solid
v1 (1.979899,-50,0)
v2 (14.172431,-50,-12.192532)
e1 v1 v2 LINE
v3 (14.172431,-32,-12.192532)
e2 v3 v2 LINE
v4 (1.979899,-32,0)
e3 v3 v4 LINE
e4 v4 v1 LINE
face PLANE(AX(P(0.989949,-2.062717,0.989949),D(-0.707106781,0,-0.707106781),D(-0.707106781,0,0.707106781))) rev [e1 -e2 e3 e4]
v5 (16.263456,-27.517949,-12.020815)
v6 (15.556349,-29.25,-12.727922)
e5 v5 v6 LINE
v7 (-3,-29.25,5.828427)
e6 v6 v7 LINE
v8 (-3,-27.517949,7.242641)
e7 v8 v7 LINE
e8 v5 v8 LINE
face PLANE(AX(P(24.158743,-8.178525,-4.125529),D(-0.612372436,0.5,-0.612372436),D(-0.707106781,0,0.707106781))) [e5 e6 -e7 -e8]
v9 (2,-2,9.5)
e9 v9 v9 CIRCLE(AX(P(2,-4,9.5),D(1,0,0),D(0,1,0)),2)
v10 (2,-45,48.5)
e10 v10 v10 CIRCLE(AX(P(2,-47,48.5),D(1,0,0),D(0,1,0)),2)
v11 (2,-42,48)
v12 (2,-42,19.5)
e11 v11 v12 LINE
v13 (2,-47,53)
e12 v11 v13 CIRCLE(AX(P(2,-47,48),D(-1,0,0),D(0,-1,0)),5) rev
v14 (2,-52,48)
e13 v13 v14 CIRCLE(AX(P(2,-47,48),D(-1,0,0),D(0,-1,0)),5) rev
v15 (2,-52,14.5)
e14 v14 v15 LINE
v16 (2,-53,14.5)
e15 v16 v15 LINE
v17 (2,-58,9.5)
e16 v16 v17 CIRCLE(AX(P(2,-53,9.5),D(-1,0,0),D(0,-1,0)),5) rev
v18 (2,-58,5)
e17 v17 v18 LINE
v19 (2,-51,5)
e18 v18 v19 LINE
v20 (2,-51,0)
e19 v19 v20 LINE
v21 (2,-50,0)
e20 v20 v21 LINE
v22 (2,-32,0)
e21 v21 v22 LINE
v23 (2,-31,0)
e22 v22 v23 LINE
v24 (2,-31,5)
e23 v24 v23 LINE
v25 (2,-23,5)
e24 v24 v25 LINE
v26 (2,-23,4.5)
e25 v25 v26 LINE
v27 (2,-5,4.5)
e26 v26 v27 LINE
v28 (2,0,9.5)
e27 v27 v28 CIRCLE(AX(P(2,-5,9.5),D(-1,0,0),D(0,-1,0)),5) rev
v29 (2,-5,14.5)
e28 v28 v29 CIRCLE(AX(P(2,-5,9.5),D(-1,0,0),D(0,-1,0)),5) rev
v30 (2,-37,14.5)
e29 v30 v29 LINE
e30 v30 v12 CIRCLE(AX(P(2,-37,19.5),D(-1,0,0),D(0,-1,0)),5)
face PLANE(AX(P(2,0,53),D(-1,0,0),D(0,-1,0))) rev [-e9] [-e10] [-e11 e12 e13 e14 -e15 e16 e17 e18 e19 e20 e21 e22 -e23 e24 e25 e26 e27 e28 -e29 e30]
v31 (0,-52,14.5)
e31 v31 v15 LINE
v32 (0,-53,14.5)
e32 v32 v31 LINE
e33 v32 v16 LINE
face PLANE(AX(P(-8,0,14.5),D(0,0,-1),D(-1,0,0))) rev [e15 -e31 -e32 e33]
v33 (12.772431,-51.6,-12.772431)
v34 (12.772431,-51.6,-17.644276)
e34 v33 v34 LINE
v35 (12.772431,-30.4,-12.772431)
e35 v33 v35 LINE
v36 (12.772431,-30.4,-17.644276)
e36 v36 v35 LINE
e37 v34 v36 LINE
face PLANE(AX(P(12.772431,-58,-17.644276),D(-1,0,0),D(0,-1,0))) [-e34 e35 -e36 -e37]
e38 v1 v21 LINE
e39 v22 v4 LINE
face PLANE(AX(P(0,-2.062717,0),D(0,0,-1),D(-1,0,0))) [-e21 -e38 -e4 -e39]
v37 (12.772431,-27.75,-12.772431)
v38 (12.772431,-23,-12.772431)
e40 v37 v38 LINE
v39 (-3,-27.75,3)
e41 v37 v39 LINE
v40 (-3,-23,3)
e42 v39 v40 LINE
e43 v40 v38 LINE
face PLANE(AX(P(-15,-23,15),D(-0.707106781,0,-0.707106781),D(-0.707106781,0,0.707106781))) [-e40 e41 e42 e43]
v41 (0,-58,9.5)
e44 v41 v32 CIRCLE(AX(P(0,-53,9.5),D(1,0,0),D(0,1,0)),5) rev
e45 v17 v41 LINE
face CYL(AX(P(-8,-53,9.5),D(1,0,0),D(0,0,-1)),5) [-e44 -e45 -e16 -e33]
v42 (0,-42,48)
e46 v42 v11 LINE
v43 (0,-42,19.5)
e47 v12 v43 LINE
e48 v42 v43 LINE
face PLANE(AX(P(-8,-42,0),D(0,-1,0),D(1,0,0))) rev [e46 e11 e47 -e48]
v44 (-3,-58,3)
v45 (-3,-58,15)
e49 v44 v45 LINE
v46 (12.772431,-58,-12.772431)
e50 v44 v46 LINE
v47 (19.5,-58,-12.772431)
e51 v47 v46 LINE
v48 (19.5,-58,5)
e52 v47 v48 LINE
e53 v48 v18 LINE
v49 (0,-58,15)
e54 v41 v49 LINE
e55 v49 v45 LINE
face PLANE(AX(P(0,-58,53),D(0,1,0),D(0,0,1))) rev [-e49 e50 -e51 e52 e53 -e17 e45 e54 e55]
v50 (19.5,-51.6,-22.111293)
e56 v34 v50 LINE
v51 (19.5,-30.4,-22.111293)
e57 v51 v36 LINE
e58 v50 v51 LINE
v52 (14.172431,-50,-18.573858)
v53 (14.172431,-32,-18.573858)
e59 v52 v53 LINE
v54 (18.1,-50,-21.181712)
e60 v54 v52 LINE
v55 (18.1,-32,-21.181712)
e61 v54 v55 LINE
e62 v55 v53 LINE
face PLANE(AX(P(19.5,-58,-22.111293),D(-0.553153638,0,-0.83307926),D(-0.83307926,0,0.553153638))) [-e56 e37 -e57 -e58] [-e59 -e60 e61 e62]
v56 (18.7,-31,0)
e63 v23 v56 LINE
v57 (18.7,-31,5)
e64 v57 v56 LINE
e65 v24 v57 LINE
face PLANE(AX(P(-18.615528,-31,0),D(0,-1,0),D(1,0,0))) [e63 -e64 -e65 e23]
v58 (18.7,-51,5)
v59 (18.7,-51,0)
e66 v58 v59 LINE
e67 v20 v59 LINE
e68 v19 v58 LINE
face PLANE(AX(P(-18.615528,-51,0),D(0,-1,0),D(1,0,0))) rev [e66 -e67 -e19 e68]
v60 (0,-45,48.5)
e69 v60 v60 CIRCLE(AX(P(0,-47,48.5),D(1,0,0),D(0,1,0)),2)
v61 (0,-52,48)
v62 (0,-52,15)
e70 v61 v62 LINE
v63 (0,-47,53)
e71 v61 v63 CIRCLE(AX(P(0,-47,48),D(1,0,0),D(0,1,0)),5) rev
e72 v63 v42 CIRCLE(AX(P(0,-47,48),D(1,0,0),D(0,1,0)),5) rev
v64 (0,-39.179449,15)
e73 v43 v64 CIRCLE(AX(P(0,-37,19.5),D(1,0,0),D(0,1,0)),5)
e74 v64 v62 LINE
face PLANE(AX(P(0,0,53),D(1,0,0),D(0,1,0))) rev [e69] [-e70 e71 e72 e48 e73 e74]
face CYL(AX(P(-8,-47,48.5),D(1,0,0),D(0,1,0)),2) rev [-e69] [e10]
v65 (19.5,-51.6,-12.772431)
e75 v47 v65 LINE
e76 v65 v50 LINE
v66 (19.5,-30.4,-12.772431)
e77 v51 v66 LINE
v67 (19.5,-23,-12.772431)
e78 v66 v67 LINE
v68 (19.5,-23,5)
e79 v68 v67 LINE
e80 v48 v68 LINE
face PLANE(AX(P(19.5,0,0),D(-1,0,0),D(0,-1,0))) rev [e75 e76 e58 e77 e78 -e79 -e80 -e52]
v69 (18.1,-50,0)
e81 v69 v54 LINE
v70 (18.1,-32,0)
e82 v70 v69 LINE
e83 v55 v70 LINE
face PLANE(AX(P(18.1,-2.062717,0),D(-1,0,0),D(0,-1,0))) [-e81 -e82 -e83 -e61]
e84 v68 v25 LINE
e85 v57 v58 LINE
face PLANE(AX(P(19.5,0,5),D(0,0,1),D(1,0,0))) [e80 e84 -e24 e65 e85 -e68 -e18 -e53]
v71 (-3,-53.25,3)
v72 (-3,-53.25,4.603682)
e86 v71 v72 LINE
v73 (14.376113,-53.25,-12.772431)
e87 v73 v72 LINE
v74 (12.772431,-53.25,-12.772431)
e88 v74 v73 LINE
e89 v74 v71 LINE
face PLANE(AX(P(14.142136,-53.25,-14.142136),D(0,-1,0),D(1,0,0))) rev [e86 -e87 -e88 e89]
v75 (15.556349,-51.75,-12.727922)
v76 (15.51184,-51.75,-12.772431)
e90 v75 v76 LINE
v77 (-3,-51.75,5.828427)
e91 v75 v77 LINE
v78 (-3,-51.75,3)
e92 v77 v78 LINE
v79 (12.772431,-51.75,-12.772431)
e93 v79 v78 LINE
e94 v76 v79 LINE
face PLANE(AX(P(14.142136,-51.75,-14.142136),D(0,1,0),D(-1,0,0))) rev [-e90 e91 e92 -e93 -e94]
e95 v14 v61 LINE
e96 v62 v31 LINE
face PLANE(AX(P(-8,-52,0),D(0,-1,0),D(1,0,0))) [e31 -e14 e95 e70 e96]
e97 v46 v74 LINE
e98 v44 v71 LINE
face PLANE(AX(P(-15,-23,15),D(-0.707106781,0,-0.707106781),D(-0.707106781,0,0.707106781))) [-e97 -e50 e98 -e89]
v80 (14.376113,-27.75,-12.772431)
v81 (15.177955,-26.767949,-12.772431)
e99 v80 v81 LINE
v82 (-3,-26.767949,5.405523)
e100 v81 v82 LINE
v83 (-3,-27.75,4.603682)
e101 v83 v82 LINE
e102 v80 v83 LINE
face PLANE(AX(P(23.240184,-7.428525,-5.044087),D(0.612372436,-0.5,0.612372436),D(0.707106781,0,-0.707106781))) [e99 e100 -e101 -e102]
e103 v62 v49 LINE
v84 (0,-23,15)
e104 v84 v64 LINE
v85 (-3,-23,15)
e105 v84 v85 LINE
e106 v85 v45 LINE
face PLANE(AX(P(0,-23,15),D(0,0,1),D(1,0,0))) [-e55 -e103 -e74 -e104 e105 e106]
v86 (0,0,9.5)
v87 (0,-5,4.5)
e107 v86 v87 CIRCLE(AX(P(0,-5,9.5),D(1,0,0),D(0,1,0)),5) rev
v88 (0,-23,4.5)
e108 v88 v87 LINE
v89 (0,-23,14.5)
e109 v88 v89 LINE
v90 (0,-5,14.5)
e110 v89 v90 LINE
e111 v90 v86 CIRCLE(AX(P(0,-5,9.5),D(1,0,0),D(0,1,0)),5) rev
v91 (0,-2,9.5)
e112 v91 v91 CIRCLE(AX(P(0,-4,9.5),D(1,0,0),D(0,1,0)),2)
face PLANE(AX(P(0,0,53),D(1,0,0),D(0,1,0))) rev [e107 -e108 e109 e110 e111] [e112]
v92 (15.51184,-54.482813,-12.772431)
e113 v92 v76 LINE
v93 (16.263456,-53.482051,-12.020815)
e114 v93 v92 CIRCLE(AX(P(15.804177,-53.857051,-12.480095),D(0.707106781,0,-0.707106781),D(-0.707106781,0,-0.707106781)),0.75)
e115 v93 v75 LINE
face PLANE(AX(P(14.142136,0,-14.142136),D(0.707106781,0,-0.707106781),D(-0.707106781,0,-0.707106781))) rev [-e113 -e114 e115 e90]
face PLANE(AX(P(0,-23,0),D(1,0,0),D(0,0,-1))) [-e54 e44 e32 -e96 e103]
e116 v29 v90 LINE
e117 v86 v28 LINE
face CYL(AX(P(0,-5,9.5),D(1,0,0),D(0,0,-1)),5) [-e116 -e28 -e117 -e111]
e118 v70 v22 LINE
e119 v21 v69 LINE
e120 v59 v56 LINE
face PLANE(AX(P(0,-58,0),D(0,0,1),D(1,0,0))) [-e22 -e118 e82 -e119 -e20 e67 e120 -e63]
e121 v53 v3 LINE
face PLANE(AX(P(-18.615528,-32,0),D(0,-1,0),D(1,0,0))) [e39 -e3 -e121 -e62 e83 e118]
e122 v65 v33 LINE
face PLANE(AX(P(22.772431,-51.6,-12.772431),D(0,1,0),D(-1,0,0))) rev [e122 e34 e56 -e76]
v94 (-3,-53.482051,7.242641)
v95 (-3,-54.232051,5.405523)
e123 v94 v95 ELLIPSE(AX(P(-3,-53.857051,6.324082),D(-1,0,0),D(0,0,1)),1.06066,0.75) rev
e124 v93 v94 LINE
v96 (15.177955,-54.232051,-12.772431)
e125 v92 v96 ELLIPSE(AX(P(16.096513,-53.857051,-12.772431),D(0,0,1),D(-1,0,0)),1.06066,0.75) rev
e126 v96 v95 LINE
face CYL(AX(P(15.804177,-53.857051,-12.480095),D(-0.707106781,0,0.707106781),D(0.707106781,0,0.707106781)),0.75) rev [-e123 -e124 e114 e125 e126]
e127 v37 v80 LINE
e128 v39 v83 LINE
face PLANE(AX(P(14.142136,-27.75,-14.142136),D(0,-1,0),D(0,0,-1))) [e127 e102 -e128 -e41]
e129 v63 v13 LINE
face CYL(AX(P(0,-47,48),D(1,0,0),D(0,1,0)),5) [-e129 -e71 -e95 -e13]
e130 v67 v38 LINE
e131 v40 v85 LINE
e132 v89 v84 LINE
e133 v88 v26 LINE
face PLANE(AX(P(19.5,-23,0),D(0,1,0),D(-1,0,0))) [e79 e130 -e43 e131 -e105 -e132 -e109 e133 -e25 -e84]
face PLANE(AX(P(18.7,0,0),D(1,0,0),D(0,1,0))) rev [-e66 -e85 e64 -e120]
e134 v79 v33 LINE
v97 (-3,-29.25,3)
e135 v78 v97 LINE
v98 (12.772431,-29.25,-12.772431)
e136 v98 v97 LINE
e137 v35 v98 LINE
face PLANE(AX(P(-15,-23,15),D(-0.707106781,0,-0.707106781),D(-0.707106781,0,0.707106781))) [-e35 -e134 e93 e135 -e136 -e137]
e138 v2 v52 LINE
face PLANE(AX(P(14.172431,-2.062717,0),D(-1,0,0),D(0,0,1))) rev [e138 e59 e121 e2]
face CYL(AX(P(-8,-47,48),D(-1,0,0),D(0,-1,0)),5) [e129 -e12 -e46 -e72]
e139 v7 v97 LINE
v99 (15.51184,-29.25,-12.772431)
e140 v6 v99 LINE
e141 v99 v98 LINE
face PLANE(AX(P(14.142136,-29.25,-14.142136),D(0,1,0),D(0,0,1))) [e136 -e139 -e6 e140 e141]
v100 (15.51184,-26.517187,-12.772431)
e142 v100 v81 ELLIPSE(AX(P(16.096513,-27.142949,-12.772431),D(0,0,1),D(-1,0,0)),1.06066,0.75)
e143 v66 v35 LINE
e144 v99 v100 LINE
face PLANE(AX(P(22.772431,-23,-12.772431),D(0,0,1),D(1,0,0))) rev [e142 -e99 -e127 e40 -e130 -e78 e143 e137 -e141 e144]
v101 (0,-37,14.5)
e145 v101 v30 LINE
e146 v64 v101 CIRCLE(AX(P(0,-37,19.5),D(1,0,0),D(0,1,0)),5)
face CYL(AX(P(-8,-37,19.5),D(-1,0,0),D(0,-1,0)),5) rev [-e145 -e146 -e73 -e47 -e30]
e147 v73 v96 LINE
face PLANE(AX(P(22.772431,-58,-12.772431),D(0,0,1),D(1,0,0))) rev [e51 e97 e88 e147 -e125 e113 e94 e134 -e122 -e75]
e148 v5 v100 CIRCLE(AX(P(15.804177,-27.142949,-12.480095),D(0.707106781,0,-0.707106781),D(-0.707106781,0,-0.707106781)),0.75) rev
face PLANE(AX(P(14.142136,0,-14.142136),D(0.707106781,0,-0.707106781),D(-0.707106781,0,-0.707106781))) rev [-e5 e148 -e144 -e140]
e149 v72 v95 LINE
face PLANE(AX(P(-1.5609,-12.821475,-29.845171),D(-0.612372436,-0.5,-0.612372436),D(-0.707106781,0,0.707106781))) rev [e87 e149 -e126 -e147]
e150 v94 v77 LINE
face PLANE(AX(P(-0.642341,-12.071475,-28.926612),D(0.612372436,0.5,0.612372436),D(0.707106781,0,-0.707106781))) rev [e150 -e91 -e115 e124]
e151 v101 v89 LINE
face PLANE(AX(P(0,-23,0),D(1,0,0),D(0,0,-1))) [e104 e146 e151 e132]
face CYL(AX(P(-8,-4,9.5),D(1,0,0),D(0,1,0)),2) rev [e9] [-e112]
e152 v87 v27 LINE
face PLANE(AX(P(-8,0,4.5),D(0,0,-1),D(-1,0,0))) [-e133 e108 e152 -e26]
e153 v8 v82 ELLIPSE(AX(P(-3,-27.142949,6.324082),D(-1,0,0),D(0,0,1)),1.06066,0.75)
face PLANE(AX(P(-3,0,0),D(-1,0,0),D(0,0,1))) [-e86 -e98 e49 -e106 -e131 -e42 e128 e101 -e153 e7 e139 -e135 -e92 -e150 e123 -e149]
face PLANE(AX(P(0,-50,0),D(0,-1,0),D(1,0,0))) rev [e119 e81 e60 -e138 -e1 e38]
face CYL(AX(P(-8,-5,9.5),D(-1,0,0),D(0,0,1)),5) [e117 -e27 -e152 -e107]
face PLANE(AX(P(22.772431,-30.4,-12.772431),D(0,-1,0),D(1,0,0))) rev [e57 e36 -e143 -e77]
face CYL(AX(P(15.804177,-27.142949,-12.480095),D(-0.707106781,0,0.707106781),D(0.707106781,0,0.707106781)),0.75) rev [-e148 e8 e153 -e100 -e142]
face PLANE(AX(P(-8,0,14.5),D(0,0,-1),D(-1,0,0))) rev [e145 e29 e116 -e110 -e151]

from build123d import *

# Parameters (mm, degrees)
SKETCH_1_W               = 2
SKETCH_1_H               = 58
EXTRUDE_1_DEPTH          = 53
SKETCH_4_W               = 5
SKETCH_4_H               = 35
EXTRUDE_3_DEPTH          = 19.5
CUT_EXTRUDE_START        = -0.8
SKETCH_9_W               = 5
SKETCH_9_H               = 20
CUT_EXTRUDE_5_DEPTH      = 16.7
SKETCH_10_R              = 2
CUT_EXTRUDE_6_DEPTH      = 10
SKETCH_11_W              = 38.5
SKETCH_11_H              = 6
SKETCH_11_H_2            = 42
SKETCH_11_W_2            = 4.5
SKETCH_11_H_3            = 23
CUT_EXTRUDE_7_DEPTH      = 10
FILLET_1_R               = 5
EXTRUDE_4_DEPTH          = 35
EXTRUDE_5_DEPTH          = 35
CUT_EXTRUDE_START_2      = 5
SKETCH_14_W              = 17.67500243
SKETCH_14_H              = 173.36044852
CUT_EXTRUDE_9_DEPTH      = 12
CUT_EXTRUDE_START_3      = 19
CUT_EXTRUDE_10_DEPTH     = 18
SKETCH_16_W              = 19.32347426
SKETCH_16_H              = 7.4
SKETCH_16_W_2            = 22.441906264
SKETCH_16_H_2            = 6.4
CUT_EXTRUDE_11_DEPTH     = 10
CUT_EXTRUDE_8_DEPTH      = 20
CUT_EXTRUDE_8_DEPTH_BACK = 43


with BuildPart() as part:
    # Эскиз1 → Бобышка-Вытянуть1 (new body)
    with BuildSketch(Plane.XY):
        with Locations((1, -29)):
            Rectangle(SKETCH_1_W, SKETCH_1_H)
    extrude(amount=EXTRUDE_1_DEPTH)

    # Эскиз4 → Бобышка-Вытянуть3 (add)
    with BuildSketch(Plane.ZY):
        with Locations((2.5, -40.5)):
            Rectangle(SKETCH_4_W, SKETCH_4_H)
    extrude(amount=-EXTRUDE_3_DEPTH)

    # Эскиз9 → Вырез-Вытянуть5 (cut)
    with BuildSketch(Plane(origin=(19.5, 0, 0), x_dir=(0, 0, -1), z_dir=(1, 0, 0)).offset(CUT_EXTRUDE_START)):
        with Locations((-2.5, -41)):
            Rectangle(SKETCH_9_W, SKETCH_9_H)
    extrude(amount=-CUT_EXTRUDE_5_DEPTH, mode=Mode.SUBTRACT)

    # Эскиз10 → Вырез-Вытянуть6 (cut)
    with BuildSketch(Plane(origin=(2, 0, 0), x_dir=(0, 0, -1), z_dir=(1, 0, 0))):
        with Locations(Location((-48.5, -47, 0), (0, 0, 90))):
            Circle(SKETCH_10_R)
        with Locations(Location((-9.5, -4, 0), (0, 0, 90))):
            Circle(SKETCH_10_R)
    extrude(amount=-CUT_EXTRUDE_6_DEPTH, mode=Mode.SUBTRACT)

    # Эскиз11 → Вырез-Вытянуть7 (cut)
    with BuildSketch(Plane(origin=(2, 0, 0), x_dir=(0, 0, -1), z_dir=(1, 0, 0))):
        with Locations((-33.75, -55)):
            Rectangle(SKETCH_11_W, SKETCH_11_H)
        with Locations((-33.75, -21)):
            Rectangle(SKETCH_11_W, SKETCH_11_H_2)
        with Locations((-2.25, -11.5)):
            Rectangle(SKETCH_11_W_2, SKETCH_11_H_3)
    extrude(amount=-CUT_EXTRUDE_7_DEPTH, mode=Mode.SUBTRACT)

    # Скругление1
    fillet_1_edges = [part.edges().sort_by_distance(p)[0] for p in [
        (1, -42, 14.5),
        (1, 0, 4.5),
        (1, 0, 14.5),
        (1, -58, 14.5),
        (1, -42, 53),
        (1, -52, 53),
    ]]
    fillet(fillet_1_edges, radius=FILLET_1_R - 0.0001)  # a hair under: the kernel refuses the full size

    # Эскиз12 → Бобышка-Вытянуть4 (add)
    with BuildSketch(Plane.XZ.offset(58)):
        Polygon((0, 0), (0, 15), (-15, 15), align=None)
    extrude(amount=-EXTRUDE_4_DEPTH)

    # Эскиз13 → Бобышка-Вытянуть5 (add)
    with BuildSketch(Plane(origin=(0, -23, 0), x_dir=(1, 0, 0), z_dir=(0, 1, 0))):
        Polygon((0, 0), (19.5, 0), (19.5, 22.111293257), (12.772431149, 17.644276295), (12.772431149, 12.772431149), align=None)
    extrude(amount=-EXTRUDE_5_DEPTH)

    # Эскиз14 → Вырез-Вытянуть9 (cut)
    with BuildSketch(Plane.ZY.offset(-2).offset(CUT_EXTRUDE_START_2)):
        with Locations((6.192960349, -52.7238676)):
            Rectangle(SKETCH_14_W, SKETCH_14_H)
    extrude(amount=CUT_EXTRUDE_9_DEPTH, mode=Mode.SUBTRACT)

    # Эскиз15 → Вырез-Вытянуть10 (cut)
    with BuildSketch(Plane.XZ.offset(31).offset(CUT_EXTRUDE_START_3)):
        Polygon((18.1, 0), (14.172431149, 0), (14.172431149, -12.192532161), (14.172431149, -24.03140998), (18.1, -24.03140998), align=None)
        Polygon((14.172431149, -12.192532161), (14.172431149, 0), (2, 0), (1.979898987, 0), align=None)
    extrude(amount=-CUT_EXTRUDE_10_DEPTH, mode=Mode.SUBTRACT)

    # Эскиз16 → Вырез-Вытянуть11 (cut)
    with BuildSketch(Plane.ZY.offset(-12.772431149)):
        with Locations((-22.434168279, -26.7)):
            Rectangle(SKETCH_16_W, SKETCH_16_H)
        with Locations((-23.993384281, -54.8)):
            Rectangle(SKETCH_16_W_2, SKETCH_16_H_2)
    extrude(amount=-CUT_EXTRUDE_11_DEPTH, mode=Mode.SUBTRACT)

    # Эскиз8 → Вырез-Вытянуть8 (cut, two sides: drawn at the far end of the back side and taken through both)
    with BuildSketch(Plane(origin=(0, 0, 0), x_dir=(-0.7071067811865437, 0, -0.7071067811865515), z_dir=(0.7071067811865515, 0, -0.7071067811865437)).offset(-CUT_EXTRUDE_8_DEPTH_BACK)):
        with BuildLine():
            Line((-2, -29.25), (0, -29.25))
            Line((0, -29.25), (0, -27.75))
            Line((0, -27.75), (-1.133974596, -27.75))
            Line((-1.133974596, -27.75), (-1.700961894, -26.767949192))
            ThreePointArc((-1.700961894, -26.767949192), (-1.626036577, -26.948834909), (-1.600480947, -27.142949192))
            ThreePointArc((-1.600480947, -27.142949192), (-2.156366663, -27.867393562), (-3, -27.517949192))
            Line((-3, -27.517949192), (-2, -29.25))
        make_face()
        with BuildLine():
            ThreePointArc((-1.700961894, -26.767949192), (-2.725480947, -26.49343014), (-3, -27.517949192))
            Line((-3, -27.517949192), (-1.700961894, -26.767949192))
        make_face()
        with BuildLine():
            Line((-1.700961894, -26.767949192), (-3, -27.517949192))
            ThreePointArc((-3, -27.517949192), (-2.156366663, -27.867393562), (-1.600480947, -27.142949192))
            ThreePointArc((-1.600480947, -27.142949192), (-1.626036577, -26.948834909), (-1.700961894, -26.767949192))
        make_face()
        with BuildLine():
            ThreePointArc((-3, -53.482050808), (-2.725480947, -54.50656986), (-1.700961894, -54.232050808))
            Line((-1.700961894, -54.232050808), (-3, -53.482050808))
        make_face()
        with BuildLine():
            Line((-3, -53.482050808), (-1.700961894, -54.232050808))
            ThreePointArc((-1.700961894, -54.232050808), (-1.626036577, -54.051165091), (-1.600480947, -53.857050808))
            ThreePointArc((-1.600480947, -53.857050808), (-2.156366663, -53.132606438), (-3, -53.482050808))
        make_face()
        with BuildLine():
            Line((-1.133974596, -53.25), (0, -53.25))
            Line((0, -53.25), (0, -51.75))
            Line((0, -51.75), (-2, -51.75))
            Line((-2, -51.75), (-3, -53.482050808))
            ThreePointArc((-3, -53.482050808), (-2.156366663, -53.132606438), (-1.600480947, -53.857050808))
            ThreePointArc((-1.600480947, -53.857050808), (-1.626036577, -54.051165091), (-1.700961894, -54.232050808))
            Line((-1.700961894, -54.232050808), (-1.133974596, -53.25))
        make_face()
    extrude(amount=CUT_EXTRUDE_8_DEPTH + CUT_EXTRUDE_8_DEPTH_BACK, mode=Mode.SUBTRACT)


solid = part.part
